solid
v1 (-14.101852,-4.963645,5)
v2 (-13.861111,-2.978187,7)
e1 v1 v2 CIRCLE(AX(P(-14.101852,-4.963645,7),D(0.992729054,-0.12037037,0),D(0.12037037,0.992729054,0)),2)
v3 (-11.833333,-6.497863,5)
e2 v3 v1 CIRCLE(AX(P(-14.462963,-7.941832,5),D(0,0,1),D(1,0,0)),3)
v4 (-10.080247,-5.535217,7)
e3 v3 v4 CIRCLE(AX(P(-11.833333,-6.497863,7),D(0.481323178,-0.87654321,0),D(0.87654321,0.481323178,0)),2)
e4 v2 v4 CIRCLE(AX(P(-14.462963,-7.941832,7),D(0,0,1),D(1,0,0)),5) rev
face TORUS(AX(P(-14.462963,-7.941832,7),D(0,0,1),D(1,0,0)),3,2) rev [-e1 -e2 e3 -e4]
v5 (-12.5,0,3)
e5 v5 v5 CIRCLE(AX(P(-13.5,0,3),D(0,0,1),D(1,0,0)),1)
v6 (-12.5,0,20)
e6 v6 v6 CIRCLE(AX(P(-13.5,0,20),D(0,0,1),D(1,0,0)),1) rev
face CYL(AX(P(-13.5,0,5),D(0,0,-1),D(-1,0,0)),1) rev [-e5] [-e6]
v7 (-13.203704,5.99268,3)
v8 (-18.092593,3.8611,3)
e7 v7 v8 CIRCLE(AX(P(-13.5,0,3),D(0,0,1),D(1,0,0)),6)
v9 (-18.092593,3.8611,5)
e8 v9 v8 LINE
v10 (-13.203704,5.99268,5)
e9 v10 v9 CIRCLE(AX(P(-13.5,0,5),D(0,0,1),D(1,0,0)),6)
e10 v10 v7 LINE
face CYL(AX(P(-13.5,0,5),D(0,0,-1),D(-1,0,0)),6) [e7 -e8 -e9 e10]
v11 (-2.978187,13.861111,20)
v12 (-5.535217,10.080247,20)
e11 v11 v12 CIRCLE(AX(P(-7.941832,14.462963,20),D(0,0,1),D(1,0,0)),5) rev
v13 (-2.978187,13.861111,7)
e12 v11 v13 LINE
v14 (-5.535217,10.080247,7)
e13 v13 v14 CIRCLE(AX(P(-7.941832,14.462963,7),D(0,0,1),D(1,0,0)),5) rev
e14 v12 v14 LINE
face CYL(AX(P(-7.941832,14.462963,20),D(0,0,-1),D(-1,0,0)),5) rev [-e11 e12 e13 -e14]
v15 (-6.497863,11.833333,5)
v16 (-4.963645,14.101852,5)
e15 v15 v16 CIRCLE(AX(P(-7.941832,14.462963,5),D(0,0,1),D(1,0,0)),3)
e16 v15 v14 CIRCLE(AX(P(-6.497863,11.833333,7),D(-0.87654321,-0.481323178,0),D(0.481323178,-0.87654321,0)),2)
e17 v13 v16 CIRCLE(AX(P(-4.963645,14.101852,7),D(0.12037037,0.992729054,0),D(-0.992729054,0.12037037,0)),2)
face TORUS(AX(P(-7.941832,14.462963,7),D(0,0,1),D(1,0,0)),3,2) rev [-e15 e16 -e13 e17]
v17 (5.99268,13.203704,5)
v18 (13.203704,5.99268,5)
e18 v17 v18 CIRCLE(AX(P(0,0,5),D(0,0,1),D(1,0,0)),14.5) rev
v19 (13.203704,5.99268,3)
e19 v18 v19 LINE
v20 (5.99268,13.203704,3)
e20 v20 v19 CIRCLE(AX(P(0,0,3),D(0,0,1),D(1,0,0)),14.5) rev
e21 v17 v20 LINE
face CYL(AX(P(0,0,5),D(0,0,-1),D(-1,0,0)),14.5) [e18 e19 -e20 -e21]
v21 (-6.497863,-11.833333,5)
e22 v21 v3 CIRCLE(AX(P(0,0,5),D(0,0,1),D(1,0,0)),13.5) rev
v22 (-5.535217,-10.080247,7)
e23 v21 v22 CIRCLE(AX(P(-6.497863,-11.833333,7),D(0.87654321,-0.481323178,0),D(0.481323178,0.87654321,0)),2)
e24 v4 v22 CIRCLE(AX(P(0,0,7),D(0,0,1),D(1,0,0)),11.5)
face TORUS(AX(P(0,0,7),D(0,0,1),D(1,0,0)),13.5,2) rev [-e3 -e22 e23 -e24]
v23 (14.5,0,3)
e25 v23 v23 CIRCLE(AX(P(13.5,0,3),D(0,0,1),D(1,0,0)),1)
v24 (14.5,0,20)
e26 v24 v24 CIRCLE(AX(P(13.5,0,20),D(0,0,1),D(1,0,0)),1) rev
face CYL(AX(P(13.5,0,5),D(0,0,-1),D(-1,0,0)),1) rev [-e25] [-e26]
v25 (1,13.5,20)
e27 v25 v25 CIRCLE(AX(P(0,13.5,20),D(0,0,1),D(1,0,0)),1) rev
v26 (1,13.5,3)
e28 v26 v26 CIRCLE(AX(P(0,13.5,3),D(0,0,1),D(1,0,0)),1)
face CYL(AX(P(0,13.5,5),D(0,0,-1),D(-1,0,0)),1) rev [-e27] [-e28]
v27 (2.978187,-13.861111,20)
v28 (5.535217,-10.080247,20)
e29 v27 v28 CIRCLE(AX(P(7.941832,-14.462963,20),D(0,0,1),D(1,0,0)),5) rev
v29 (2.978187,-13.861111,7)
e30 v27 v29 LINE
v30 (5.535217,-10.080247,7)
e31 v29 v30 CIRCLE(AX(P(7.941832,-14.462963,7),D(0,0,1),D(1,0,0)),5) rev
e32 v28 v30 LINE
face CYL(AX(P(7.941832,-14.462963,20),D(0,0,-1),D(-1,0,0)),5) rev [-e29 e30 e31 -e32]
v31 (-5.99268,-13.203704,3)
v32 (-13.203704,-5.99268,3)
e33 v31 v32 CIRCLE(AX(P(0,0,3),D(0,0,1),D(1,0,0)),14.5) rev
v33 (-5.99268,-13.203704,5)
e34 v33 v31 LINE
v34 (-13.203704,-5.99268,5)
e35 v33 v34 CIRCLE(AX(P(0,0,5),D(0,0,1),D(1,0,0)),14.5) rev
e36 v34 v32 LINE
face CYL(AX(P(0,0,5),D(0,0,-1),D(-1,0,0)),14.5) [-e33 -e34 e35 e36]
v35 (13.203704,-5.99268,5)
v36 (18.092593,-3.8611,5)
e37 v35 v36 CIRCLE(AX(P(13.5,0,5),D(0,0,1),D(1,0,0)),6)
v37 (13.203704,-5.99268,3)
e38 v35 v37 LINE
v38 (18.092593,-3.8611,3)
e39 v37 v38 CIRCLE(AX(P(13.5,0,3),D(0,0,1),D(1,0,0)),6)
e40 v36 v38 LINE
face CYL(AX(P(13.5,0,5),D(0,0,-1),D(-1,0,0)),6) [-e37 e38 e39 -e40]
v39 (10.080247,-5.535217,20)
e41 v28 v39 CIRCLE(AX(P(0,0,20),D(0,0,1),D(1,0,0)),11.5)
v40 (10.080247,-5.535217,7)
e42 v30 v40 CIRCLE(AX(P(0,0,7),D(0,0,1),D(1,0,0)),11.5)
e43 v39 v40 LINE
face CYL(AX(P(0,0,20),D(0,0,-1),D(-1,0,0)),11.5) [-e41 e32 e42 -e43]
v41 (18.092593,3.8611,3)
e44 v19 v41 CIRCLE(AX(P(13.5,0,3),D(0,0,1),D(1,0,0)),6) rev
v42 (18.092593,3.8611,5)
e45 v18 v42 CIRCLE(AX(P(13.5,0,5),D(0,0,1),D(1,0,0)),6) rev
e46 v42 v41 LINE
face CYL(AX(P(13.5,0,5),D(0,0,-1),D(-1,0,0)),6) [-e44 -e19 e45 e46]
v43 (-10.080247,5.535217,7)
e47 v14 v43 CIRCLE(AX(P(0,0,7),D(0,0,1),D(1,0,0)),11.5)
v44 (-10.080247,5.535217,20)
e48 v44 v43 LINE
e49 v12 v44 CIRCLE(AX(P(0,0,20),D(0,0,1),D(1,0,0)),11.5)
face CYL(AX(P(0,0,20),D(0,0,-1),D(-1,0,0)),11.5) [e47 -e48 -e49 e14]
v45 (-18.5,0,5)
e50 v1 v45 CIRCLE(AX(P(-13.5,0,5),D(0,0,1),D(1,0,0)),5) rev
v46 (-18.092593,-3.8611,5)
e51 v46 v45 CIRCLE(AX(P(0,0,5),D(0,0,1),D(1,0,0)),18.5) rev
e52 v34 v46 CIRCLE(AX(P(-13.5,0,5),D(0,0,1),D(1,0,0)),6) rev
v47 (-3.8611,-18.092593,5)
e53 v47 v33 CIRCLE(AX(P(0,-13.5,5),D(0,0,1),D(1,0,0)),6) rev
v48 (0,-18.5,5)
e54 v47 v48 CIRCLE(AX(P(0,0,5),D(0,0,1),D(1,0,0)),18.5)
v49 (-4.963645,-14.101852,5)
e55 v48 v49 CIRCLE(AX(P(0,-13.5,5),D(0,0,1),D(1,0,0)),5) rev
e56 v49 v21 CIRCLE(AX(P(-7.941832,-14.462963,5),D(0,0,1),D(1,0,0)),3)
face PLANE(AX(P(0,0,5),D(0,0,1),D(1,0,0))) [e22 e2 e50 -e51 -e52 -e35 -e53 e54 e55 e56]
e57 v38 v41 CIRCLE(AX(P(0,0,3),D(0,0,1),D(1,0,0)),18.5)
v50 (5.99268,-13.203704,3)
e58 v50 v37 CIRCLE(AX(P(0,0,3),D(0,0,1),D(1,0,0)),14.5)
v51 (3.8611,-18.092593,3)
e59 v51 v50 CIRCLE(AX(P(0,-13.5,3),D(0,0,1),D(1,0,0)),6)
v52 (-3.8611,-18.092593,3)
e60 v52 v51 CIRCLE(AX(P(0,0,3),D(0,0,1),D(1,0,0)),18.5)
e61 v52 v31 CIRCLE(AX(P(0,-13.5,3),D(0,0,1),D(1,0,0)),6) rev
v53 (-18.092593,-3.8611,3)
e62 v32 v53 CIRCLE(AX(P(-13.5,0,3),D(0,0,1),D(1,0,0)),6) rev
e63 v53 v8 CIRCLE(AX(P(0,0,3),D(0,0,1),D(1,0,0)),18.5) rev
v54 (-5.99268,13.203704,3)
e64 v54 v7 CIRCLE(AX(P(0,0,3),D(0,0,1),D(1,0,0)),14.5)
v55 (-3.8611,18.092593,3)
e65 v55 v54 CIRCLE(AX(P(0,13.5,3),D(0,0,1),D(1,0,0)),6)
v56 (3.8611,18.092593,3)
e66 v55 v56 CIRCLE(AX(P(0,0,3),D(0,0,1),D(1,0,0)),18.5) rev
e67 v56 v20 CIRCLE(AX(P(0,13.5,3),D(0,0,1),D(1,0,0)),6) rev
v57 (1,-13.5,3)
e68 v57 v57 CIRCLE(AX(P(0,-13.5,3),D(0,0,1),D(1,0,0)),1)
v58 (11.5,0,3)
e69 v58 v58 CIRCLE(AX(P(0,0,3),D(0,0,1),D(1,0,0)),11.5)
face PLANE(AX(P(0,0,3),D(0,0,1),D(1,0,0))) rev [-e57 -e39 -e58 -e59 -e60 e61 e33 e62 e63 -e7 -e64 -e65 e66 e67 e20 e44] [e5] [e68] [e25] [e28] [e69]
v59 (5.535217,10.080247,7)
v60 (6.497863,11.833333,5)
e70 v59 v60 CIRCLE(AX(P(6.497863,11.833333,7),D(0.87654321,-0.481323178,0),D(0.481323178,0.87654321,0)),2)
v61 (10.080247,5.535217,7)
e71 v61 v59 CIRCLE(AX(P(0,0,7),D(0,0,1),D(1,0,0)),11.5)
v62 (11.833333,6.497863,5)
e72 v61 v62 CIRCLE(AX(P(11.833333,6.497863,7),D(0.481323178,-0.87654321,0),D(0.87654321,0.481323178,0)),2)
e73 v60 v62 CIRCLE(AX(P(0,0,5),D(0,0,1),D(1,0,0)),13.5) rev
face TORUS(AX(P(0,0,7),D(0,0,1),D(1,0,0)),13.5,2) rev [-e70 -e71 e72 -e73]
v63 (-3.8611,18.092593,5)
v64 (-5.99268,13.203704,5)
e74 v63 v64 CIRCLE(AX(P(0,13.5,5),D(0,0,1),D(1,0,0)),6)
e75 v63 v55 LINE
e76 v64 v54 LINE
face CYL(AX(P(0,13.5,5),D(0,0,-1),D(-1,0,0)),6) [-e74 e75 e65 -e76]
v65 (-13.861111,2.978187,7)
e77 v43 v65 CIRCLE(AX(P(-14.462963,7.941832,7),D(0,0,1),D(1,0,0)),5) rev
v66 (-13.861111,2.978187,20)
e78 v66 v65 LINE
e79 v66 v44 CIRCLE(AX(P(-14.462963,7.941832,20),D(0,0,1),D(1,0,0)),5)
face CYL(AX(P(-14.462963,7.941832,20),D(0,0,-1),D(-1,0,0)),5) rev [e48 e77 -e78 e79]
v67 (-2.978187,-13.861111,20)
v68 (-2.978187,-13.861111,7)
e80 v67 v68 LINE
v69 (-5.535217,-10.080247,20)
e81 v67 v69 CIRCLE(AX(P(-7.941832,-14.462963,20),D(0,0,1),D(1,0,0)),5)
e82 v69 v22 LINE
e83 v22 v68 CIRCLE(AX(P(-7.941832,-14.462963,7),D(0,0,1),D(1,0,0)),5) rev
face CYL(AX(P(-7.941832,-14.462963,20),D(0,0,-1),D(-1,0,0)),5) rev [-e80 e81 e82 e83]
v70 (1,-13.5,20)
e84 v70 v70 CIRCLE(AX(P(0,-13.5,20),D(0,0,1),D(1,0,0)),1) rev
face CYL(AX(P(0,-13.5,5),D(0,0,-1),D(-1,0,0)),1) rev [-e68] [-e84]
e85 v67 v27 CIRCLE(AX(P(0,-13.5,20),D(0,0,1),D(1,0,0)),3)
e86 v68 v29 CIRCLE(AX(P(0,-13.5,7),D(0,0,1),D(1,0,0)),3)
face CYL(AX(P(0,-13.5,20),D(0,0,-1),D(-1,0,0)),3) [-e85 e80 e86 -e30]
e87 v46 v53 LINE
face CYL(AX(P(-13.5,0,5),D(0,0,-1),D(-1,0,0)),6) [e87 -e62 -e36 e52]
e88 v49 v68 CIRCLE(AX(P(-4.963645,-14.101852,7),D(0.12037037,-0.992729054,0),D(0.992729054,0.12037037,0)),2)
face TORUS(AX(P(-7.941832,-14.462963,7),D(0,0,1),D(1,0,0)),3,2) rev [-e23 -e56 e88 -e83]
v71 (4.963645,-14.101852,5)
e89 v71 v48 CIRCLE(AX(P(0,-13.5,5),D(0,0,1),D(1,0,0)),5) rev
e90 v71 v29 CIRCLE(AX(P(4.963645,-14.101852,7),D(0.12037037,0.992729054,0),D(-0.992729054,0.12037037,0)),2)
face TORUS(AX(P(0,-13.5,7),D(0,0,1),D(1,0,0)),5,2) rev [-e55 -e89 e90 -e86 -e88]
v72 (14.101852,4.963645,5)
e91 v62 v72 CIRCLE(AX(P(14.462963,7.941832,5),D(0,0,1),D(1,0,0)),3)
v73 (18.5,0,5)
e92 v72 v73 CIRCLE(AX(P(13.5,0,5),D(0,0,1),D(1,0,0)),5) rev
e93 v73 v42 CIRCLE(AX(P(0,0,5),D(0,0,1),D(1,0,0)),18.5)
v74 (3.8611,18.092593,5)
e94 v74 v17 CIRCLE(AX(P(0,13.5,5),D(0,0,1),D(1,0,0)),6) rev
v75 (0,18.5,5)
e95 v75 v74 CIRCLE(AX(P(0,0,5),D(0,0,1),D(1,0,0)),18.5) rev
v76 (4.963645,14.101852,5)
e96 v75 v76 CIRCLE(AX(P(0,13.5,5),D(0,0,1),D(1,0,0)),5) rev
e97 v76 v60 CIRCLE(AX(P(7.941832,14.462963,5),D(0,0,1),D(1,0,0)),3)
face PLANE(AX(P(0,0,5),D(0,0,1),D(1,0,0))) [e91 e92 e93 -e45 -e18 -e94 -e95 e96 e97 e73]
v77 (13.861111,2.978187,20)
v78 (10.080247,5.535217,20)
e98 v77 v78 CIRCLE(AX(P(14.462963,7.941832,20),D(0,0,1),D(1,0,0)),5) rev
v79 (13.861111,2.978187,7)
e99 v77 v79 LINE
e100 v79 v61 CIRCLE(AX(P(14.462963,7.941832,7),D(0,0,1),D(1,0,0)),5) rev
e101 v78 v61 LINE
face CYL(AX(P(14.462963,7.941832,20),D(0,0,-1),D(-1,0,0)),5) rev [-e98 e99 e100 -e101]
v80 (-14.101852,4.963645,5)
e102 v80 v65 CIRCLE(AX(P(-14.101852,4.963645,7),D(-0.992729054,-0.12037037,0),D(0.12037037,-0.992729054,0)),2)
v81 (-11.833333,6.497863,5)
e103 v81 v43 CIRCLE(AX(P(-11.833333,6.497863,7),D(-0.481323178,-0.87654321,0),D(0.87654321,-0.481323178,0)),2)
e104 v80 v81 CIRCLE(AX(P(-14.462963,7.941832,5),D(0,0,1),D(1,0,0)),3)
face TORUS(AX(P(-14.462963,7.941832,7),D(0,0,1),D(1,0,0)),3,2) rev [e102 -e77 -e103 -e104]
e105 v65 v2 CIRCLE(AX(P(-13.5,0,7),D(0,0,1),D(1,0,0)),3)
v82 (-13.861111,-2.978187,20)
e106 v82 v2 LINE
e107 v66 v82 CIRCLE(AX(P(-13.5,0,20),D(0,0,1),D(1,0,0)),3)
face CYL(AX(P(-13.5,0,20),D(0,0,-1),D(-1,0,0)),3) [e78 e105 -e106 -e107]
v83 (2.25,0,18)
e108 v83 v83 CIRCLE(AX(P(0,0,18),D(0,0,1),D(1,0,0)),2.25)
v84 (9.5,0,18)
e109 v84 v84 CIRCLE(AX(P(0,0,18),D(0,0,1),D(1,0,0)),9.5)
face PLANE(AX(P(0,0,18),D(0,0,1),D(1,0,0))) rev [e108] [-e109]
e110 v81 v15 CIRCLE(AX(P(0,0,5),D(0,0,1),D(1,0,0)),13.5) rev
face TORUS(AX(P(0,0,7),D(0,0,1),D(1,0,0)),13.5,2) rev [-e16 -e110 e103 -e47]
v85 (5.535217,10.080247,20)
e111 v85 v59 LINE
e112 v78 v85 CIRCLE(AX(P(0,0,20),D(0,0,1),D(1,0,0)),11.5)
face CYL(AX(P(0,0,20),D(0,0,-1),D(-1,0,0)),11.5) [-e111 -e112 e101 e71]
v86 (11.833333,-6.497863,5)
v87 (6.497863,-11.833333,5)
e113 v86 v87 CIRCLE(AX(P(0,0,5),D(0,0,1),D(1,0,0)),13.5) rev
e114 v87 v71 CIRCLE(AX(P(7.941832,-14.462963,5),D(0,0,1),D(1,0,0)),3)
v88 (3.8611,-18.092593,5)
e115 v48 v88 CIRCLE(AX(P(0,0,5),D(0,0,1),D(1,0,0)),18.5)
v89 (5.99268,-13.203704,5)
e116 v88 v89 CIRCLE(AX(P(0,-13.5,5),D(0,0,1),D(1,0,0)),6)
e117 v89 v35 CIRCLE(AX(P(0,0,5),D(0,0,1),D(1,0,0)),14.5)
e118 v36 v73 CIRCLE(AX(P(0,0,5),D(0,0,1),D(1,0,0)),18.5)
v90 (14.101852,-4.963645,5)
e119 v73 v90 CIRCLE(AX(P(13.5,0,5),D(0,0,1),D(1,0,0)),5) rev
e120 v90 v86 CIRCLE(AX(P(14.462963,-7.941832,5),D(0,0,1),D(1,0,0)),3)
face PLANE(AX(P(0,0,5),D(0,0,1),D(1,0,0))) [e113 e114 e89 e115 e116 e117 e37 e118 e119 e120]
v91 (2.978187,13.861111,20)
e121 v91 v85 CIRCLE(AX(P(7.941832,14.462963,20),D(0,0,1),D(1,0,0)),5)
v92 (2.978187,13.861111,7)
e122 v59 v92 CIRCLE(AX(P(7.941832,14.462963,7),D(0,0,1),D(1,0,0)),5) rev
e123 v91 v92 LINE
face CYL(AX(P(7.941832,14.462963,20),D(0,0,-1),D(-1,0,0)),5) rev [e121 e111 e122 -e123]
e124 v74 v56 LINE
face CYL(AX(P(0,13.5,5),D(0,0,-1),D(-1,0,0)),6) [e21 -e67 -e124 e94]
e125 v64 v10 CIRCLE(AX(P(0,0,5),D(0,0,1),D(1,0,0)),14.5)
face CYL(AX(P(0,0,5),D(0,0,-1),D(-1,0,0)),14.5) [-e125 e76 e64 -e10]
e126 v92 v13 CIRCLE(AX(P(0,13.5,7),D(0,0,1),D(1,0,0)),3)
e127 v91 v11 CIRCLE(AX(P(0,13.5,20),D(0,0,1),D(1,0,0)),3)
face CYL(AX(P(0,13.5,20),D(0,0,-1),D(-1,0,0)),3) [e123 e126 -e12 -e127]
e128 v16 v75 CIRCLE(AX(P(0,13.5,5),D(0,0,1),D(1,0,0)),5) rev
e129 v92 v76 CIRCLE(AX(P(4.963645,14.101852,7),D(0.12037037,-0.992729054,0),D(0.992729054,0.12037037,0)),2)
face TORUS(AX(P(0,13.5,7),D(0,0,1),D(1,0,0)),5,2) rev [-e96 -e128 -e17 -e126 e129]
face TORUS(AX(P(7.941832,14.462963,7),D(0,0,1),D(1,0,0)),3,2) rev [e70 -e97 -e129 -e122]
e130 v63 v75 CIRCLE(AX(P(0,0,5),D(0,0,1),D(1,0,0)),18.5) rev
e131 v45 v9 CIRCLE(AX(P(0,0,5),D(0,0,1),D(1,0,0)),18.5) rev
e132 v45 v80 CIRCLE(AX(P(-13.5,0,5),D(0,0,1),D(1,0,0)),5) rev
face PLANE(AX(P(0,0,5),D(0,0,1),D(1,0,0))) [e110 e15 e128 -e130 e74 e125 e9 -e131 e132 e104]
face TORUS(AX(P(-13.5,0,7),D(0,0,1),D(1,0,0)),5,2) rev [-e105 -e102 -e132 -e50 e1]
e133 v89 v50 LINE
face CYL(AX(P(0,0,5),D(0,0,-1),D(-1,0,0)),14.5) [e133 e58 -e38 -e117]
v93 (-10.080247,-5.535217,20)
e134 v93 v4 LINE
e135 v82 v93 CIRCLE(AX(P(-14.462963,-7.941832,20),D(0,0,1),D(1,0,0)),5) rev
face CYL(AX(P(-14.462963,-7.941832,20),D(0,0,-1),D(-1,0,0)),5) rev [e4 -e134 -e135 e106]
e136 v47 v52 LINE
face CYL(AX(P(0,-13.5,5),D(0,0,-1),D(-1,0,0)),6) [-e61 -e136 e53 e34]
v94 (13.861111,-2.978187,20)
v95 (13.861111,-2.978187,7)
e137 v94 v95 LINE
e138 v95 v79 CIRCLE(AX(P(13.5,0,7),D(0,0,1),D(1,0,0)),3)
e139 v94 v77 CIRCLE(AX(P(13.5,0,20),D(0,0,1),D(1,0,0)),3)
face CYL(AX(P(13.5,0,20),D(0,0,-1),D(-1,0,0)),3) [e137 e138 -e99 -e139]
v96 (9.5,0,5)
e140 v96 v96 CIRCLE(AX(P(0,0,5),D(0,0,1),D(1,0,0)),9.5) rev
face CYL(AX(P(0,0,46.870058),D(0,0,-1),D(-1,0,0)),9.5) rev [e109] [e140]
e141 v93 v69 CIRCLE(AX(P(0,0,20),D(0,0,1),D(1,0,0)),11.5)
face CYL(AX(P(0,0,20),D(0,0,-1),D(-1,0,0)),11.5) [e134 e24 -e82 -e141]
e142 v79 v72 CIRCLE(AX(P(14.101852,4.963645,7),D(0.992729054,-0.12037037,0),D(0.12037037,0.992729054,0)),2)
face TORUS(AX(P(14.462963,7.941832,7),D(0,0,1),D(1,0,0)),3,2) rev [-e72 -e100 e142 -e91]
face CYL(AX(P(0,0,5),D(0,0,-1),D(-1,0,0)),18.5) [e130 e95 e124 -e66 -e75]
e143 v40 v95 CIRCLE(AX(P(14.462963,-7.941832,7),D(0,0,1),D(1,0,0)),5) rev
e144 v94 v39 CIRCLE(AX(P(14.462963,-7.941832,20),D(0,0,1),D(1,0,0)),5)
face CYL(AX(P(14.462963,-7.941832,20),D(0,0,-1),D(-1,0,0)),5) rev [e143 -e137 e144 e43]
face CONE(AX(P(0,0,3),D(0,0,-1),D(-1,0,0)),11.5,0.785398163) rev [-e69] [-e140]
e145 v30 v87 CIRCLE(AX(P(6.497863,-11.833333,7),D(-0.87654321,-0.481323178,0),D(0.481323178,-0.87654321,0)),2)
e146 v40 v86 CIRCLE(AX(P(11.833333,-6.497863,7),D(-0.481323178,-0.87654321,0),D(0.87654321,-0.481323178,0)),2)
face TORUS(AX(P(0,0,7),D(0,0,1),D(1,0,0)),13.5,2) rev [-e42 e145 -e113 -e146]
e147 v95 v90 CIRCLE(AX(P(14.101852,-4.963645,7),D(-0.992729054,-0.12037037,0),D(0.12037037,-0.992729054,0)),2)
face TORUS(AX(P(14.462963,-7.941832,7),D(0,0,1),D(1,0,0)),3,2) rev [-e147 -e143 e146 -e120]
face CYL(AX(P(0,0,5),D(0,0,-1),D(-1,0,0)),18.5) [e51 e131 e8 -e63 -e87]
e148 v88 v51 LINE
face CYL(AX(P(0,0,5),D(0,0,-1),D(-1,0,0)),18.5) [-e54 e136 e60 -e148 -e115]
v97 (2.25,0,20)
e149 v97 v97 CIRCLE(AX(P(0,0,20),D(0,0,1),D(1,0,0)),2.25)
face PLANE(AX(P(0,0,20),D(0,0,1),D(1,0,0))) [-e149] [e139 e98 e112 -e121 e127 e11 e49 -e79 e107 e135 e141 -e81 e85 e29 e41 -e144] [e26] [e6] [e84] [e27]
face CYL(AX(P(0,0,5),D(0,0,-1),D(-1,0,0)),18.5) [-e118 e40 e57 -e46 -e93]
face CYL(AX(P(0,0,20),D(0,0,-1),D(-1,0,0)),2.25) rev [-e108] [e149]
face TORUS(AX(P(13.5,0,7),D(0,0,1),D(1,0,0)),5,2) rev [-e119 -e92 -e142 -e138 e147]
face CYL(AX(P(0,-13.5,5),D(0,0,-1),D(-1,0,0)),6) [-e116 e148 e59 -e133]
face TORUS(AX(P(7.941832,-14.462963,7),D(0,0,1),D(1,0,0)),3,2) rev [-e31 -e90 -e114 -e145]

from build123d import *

# Parameters (mm, degrees)
SKETCH1_R               = 1
BOSS_EXTRUDE1_DEPTH     = 2
SKETCH2_R               = 9.5
SKETCH2_R_2             = 1
SKETCH2_R_3             = 2.25
BOSS_EXTRUDE2_DEPTH     = 15
CUT_EXTRUDE1_DEPTH      = 13
CUT_EXTRUDE1_DEPTH_BACK = 31.1579177
SKETCH2_3_R             = 9.5
SKETCH2_3_R_2           = 2.25
CHAMFER1_SIZE           = 2
FILLET1_R               = 2


with BuildPart() as part:
    # Sketch1 → Boss-Extrude1 (new body)
    with BuildSketch(Plane.XY.offset(3)):
        with BuildLine():
            ThreePointArc((-3.861100009, -18.092592593), (0, -18.5), (3.861100009, -18.092592593))
            ThreePointArc((3.861100009, -18.092592593), (5.499959243, -15.898009243), (5.992679576, -13.203703704))
            ThreePointArc((5.992679576, -13.203703704), (10.253048327, -10.253048327), (13.203703704, -5.992679576))
            ThreePointArc((13.203703704, -5.992679576), (15.898009243, -5.499959243), (18.092592593, -3.861100009))
            ThreePointArc((18.092592593, -3.861100009), (18.5, 0), (18.092592593, 3.861100009))
            ThreePointArc((18.092592593, 3.861100009), (15.898009243, 5.499959243), (13.203703704, 5.992679576))
            ThreePointArc((13.203703704, 5.992679576), (10.253048327, 10.253048327), (5.992679576, 13.203703704))
            ThreePointArc((5.992679576, 13.203703704), (5.499959243, 15.898009243), (3.861100009, 18.092592593))
            ThreePointArc((3.861100009, 18.092592593), (0, 18.5), (-3.861100009, 18.092592593))
            ThreePointArc((-3.861100009, 18.092592593), (-5.499959243, 15.898009243), (-5.992679576, 13.203703704))
            ThreePointArc((-5.992679576, 13.203703704), (-10.253048327, 10.253048327), (-13.203703704, 5.992679576))
            ThreePointArc((-13.203703704, 5.992679576), (-15.898009243, 5.499959243), (-18.092592593, 3.861100009))
            ThreePointArc((-18.092592593, 3.861100009), (-18.5, 0), (-18.092592593, -3.861100009))
            ThreePointArc((-18.092592593, -3.861100009), (-15.898009243, -5.499959243), (-13.203703704, -5.992679576))
            ThreePointArc((-13.203703704, -5.992679576), (-10.253048327, -10.253048327), (-5.992679576, -13.203703704))
            ThreePointArc((-5.992679576, -13.203703704), (-5.499959243, -15.898009243), (-3.861100009, -18.092592593))
        make_face()
        with Locations((13.5, 0)):
            Circle(SKETCH1_R, mode=Mode.SUBTRACT)
        with Locations((0, 13.5)):
            Circle(SKETCH1_R, mode=Mode.SUBTRACT)
        with Locations((-13.5, 0)):
            Circle(SKETCH1_R, mode=Mode.SUBTRACT)
        with Locations((0, -13.5)):
            Circle(SKETCH1_R, mode=Mode.SUBTRACT)
    extrude(amount=BOSS_EXTRUDE1_DEPTH)

    # Sketch2 → Boss-Extrude2 (add)
    # profile 1 of 2: a face of its own
    with BuildSketch(Plane.XY.offset(5)):
        with BuildLine():
            ThreePointArc((2.978187161, 13.861111111), (3.800103213, 11.661877619), (5.535216541, 10.080246914))
            ThreePointArc((5.535216541, 10.080246914), (8.131727984, 8.131727984), (10.080246914, 5.535216541))
            ThreePointArc((10.080246914, 5.535216541), (11.661877619, 3.800103213), (13.861111111, 2.978187161))
            ThreePointArc((13.861111111, 2.978187161), (16.5, 0), (13.861111111, -2.978187161))
            ThreePointArc((13.861111111, -2.978187161), (11.661877619, -3.800103213), (10.080246914, -5.535216541))
            ThreePointArc((10.080246914, -5.535216541), (8.131727984, -8.131727984), (5.535216541, -10.080246914))
            ThreePointArc((5.535216541, -10.080246914), (3.800103213, -11.661877619), (2.978187161, -13.861111111))
            ThreePointArc((2.978187161, -13.861111111), (0, -16.5), (-2.978187161, -13.861111111))
            ThreePointArc((-2.978187161, -13.861111111), (-3.800103213, -11.661877619), (-5.535216541, -10.080246914))
            ThreePointArc((-5.535216541, -10.080246914), (-8.131727984, -8.131727984), (-10.080246914, -5.535216541))
            ThreePointArc((-10.080246914, -5.535216541), (-11.661877619, -3.800103213), (-13.861111111, -2.978187161))
            ThreePointArc((-13.861111111, -2.978187161), (-16.5, 0), (-13.861111111, 2.978187161))
            ThreePointArc((-13.861111111, 2.978187161), (-11.661877619, 3.800103213), (-10.080246914, 5.535216541))
            ThreePointArc((-10.080246914, 5.535216541), (-8.131727984, 8.131727984), (-5.535216541, 10.080246914))
            ThreePointArc((-5.535216541, 10.080246914), (-3.800103213, 11.661877619), (-2.978187161, 13.861111111))
            ThreePointArc((-2.978187161, 13.861111111), (0, 16.5), (2.978187161, 13.861111111))
        make_face()
        Circle(SKETCH2_R, mode=Mode.SUBTRACT)
        with Locations((-13.5, 0)):
            Circle(SKETCH2_R_2, mode=Mode.SUBTRACT)
        with Locations((13.5, 0)):
            Circle(SKETCH2_R_2, mode=Mode.SUBTRACT)
        with Locations((0, 13.5)):
            Circle(SKETCH2_R_2, mode=Mode.SUBTRACT)
        with Locations((0, -13.5)):
            Circle(SKETCH2_R_2, mode=Mode.SUBTRACT)
    # profile 2 of 2: a face of its own
    with BuildSketch(Plane.XY.offset(5)):
        Circle(SKETCH2_R)
        Circle(SKETCH2_R_3, mode=Mode.SUBTRACT)
    extrude(amount=BOSS_EXTRUDE2_DEPTH)

    # Sketch2<3> → Cut-Extrude1 (cut, two sides: drawn at the far end of the back side and taken through both)
    # profile 1 of 2: a face of its own
    with BuildSketch(Plane.XY.offset(5).offset(-CUT_EXTRUDE1_DEPTH_BACK)):
        Circle(SKETCH2_3_R)
        Circle(SKETCH2_3_R_2, mode=Mode.SUBTRACT)
    # profile 2 of 2: a face of its own
    with BuildSketch(Plane.XY.offset(5).offset(-CUT_EXTRUDE1_DEPTH_BACK)):
        Circle(SKETCH2_3_R_2)
    extrude(amount=CUT_EXTRUDE1_DEPTH + CUT_EXTRUDE1_DEPTH_BACK, mode=Mode.SUBTRACT)

    # Chamfer1
    chamfer1_edges = [part.edges().sort_by_distance(p)[0] for p in [
        (-9.5, 0, 3),
    ]]
    chamfer(chamfer1_edges, length=CHAMFER1_SIZE - 0.0001)  # a hair under: the kernel refuses the full size

    # Fillet1
    fillet1_edges = [part.edges().sort_by_distance(p)[0] for p in [
        (-16.5, 0, 5),
        (-11.661877619, -3.800103213, 5),
        (-8.131727984, -8.131727984, 5),
        (0, -16.5, 5),
        (3.800103213, -11.661877619, 5),
        (8.131727984, -8.131727984, 5),
        (16.5, 0, 5),
        (11.661877619, 3.800103213, 5),
        (8.131727984, 8.131727984, 5),
        (3.800103213, 11.661877619, 5),
        (11.661877619, -3.800103213, 5),
        (-3.800103213, -11.661877619, 5),
        (-11.661877619, 3.800103213, 5),
        (0, 16.5, 5),
        (-3.800103213, 11.661877619, 5),
        (-8.131727984, 8.131727984, 5),
    ]]
    fillet(fillet1_edges, radius=FILLET1_R - 0.0001)  # a hair under: the kernel refuses the full size


solid = part.part
